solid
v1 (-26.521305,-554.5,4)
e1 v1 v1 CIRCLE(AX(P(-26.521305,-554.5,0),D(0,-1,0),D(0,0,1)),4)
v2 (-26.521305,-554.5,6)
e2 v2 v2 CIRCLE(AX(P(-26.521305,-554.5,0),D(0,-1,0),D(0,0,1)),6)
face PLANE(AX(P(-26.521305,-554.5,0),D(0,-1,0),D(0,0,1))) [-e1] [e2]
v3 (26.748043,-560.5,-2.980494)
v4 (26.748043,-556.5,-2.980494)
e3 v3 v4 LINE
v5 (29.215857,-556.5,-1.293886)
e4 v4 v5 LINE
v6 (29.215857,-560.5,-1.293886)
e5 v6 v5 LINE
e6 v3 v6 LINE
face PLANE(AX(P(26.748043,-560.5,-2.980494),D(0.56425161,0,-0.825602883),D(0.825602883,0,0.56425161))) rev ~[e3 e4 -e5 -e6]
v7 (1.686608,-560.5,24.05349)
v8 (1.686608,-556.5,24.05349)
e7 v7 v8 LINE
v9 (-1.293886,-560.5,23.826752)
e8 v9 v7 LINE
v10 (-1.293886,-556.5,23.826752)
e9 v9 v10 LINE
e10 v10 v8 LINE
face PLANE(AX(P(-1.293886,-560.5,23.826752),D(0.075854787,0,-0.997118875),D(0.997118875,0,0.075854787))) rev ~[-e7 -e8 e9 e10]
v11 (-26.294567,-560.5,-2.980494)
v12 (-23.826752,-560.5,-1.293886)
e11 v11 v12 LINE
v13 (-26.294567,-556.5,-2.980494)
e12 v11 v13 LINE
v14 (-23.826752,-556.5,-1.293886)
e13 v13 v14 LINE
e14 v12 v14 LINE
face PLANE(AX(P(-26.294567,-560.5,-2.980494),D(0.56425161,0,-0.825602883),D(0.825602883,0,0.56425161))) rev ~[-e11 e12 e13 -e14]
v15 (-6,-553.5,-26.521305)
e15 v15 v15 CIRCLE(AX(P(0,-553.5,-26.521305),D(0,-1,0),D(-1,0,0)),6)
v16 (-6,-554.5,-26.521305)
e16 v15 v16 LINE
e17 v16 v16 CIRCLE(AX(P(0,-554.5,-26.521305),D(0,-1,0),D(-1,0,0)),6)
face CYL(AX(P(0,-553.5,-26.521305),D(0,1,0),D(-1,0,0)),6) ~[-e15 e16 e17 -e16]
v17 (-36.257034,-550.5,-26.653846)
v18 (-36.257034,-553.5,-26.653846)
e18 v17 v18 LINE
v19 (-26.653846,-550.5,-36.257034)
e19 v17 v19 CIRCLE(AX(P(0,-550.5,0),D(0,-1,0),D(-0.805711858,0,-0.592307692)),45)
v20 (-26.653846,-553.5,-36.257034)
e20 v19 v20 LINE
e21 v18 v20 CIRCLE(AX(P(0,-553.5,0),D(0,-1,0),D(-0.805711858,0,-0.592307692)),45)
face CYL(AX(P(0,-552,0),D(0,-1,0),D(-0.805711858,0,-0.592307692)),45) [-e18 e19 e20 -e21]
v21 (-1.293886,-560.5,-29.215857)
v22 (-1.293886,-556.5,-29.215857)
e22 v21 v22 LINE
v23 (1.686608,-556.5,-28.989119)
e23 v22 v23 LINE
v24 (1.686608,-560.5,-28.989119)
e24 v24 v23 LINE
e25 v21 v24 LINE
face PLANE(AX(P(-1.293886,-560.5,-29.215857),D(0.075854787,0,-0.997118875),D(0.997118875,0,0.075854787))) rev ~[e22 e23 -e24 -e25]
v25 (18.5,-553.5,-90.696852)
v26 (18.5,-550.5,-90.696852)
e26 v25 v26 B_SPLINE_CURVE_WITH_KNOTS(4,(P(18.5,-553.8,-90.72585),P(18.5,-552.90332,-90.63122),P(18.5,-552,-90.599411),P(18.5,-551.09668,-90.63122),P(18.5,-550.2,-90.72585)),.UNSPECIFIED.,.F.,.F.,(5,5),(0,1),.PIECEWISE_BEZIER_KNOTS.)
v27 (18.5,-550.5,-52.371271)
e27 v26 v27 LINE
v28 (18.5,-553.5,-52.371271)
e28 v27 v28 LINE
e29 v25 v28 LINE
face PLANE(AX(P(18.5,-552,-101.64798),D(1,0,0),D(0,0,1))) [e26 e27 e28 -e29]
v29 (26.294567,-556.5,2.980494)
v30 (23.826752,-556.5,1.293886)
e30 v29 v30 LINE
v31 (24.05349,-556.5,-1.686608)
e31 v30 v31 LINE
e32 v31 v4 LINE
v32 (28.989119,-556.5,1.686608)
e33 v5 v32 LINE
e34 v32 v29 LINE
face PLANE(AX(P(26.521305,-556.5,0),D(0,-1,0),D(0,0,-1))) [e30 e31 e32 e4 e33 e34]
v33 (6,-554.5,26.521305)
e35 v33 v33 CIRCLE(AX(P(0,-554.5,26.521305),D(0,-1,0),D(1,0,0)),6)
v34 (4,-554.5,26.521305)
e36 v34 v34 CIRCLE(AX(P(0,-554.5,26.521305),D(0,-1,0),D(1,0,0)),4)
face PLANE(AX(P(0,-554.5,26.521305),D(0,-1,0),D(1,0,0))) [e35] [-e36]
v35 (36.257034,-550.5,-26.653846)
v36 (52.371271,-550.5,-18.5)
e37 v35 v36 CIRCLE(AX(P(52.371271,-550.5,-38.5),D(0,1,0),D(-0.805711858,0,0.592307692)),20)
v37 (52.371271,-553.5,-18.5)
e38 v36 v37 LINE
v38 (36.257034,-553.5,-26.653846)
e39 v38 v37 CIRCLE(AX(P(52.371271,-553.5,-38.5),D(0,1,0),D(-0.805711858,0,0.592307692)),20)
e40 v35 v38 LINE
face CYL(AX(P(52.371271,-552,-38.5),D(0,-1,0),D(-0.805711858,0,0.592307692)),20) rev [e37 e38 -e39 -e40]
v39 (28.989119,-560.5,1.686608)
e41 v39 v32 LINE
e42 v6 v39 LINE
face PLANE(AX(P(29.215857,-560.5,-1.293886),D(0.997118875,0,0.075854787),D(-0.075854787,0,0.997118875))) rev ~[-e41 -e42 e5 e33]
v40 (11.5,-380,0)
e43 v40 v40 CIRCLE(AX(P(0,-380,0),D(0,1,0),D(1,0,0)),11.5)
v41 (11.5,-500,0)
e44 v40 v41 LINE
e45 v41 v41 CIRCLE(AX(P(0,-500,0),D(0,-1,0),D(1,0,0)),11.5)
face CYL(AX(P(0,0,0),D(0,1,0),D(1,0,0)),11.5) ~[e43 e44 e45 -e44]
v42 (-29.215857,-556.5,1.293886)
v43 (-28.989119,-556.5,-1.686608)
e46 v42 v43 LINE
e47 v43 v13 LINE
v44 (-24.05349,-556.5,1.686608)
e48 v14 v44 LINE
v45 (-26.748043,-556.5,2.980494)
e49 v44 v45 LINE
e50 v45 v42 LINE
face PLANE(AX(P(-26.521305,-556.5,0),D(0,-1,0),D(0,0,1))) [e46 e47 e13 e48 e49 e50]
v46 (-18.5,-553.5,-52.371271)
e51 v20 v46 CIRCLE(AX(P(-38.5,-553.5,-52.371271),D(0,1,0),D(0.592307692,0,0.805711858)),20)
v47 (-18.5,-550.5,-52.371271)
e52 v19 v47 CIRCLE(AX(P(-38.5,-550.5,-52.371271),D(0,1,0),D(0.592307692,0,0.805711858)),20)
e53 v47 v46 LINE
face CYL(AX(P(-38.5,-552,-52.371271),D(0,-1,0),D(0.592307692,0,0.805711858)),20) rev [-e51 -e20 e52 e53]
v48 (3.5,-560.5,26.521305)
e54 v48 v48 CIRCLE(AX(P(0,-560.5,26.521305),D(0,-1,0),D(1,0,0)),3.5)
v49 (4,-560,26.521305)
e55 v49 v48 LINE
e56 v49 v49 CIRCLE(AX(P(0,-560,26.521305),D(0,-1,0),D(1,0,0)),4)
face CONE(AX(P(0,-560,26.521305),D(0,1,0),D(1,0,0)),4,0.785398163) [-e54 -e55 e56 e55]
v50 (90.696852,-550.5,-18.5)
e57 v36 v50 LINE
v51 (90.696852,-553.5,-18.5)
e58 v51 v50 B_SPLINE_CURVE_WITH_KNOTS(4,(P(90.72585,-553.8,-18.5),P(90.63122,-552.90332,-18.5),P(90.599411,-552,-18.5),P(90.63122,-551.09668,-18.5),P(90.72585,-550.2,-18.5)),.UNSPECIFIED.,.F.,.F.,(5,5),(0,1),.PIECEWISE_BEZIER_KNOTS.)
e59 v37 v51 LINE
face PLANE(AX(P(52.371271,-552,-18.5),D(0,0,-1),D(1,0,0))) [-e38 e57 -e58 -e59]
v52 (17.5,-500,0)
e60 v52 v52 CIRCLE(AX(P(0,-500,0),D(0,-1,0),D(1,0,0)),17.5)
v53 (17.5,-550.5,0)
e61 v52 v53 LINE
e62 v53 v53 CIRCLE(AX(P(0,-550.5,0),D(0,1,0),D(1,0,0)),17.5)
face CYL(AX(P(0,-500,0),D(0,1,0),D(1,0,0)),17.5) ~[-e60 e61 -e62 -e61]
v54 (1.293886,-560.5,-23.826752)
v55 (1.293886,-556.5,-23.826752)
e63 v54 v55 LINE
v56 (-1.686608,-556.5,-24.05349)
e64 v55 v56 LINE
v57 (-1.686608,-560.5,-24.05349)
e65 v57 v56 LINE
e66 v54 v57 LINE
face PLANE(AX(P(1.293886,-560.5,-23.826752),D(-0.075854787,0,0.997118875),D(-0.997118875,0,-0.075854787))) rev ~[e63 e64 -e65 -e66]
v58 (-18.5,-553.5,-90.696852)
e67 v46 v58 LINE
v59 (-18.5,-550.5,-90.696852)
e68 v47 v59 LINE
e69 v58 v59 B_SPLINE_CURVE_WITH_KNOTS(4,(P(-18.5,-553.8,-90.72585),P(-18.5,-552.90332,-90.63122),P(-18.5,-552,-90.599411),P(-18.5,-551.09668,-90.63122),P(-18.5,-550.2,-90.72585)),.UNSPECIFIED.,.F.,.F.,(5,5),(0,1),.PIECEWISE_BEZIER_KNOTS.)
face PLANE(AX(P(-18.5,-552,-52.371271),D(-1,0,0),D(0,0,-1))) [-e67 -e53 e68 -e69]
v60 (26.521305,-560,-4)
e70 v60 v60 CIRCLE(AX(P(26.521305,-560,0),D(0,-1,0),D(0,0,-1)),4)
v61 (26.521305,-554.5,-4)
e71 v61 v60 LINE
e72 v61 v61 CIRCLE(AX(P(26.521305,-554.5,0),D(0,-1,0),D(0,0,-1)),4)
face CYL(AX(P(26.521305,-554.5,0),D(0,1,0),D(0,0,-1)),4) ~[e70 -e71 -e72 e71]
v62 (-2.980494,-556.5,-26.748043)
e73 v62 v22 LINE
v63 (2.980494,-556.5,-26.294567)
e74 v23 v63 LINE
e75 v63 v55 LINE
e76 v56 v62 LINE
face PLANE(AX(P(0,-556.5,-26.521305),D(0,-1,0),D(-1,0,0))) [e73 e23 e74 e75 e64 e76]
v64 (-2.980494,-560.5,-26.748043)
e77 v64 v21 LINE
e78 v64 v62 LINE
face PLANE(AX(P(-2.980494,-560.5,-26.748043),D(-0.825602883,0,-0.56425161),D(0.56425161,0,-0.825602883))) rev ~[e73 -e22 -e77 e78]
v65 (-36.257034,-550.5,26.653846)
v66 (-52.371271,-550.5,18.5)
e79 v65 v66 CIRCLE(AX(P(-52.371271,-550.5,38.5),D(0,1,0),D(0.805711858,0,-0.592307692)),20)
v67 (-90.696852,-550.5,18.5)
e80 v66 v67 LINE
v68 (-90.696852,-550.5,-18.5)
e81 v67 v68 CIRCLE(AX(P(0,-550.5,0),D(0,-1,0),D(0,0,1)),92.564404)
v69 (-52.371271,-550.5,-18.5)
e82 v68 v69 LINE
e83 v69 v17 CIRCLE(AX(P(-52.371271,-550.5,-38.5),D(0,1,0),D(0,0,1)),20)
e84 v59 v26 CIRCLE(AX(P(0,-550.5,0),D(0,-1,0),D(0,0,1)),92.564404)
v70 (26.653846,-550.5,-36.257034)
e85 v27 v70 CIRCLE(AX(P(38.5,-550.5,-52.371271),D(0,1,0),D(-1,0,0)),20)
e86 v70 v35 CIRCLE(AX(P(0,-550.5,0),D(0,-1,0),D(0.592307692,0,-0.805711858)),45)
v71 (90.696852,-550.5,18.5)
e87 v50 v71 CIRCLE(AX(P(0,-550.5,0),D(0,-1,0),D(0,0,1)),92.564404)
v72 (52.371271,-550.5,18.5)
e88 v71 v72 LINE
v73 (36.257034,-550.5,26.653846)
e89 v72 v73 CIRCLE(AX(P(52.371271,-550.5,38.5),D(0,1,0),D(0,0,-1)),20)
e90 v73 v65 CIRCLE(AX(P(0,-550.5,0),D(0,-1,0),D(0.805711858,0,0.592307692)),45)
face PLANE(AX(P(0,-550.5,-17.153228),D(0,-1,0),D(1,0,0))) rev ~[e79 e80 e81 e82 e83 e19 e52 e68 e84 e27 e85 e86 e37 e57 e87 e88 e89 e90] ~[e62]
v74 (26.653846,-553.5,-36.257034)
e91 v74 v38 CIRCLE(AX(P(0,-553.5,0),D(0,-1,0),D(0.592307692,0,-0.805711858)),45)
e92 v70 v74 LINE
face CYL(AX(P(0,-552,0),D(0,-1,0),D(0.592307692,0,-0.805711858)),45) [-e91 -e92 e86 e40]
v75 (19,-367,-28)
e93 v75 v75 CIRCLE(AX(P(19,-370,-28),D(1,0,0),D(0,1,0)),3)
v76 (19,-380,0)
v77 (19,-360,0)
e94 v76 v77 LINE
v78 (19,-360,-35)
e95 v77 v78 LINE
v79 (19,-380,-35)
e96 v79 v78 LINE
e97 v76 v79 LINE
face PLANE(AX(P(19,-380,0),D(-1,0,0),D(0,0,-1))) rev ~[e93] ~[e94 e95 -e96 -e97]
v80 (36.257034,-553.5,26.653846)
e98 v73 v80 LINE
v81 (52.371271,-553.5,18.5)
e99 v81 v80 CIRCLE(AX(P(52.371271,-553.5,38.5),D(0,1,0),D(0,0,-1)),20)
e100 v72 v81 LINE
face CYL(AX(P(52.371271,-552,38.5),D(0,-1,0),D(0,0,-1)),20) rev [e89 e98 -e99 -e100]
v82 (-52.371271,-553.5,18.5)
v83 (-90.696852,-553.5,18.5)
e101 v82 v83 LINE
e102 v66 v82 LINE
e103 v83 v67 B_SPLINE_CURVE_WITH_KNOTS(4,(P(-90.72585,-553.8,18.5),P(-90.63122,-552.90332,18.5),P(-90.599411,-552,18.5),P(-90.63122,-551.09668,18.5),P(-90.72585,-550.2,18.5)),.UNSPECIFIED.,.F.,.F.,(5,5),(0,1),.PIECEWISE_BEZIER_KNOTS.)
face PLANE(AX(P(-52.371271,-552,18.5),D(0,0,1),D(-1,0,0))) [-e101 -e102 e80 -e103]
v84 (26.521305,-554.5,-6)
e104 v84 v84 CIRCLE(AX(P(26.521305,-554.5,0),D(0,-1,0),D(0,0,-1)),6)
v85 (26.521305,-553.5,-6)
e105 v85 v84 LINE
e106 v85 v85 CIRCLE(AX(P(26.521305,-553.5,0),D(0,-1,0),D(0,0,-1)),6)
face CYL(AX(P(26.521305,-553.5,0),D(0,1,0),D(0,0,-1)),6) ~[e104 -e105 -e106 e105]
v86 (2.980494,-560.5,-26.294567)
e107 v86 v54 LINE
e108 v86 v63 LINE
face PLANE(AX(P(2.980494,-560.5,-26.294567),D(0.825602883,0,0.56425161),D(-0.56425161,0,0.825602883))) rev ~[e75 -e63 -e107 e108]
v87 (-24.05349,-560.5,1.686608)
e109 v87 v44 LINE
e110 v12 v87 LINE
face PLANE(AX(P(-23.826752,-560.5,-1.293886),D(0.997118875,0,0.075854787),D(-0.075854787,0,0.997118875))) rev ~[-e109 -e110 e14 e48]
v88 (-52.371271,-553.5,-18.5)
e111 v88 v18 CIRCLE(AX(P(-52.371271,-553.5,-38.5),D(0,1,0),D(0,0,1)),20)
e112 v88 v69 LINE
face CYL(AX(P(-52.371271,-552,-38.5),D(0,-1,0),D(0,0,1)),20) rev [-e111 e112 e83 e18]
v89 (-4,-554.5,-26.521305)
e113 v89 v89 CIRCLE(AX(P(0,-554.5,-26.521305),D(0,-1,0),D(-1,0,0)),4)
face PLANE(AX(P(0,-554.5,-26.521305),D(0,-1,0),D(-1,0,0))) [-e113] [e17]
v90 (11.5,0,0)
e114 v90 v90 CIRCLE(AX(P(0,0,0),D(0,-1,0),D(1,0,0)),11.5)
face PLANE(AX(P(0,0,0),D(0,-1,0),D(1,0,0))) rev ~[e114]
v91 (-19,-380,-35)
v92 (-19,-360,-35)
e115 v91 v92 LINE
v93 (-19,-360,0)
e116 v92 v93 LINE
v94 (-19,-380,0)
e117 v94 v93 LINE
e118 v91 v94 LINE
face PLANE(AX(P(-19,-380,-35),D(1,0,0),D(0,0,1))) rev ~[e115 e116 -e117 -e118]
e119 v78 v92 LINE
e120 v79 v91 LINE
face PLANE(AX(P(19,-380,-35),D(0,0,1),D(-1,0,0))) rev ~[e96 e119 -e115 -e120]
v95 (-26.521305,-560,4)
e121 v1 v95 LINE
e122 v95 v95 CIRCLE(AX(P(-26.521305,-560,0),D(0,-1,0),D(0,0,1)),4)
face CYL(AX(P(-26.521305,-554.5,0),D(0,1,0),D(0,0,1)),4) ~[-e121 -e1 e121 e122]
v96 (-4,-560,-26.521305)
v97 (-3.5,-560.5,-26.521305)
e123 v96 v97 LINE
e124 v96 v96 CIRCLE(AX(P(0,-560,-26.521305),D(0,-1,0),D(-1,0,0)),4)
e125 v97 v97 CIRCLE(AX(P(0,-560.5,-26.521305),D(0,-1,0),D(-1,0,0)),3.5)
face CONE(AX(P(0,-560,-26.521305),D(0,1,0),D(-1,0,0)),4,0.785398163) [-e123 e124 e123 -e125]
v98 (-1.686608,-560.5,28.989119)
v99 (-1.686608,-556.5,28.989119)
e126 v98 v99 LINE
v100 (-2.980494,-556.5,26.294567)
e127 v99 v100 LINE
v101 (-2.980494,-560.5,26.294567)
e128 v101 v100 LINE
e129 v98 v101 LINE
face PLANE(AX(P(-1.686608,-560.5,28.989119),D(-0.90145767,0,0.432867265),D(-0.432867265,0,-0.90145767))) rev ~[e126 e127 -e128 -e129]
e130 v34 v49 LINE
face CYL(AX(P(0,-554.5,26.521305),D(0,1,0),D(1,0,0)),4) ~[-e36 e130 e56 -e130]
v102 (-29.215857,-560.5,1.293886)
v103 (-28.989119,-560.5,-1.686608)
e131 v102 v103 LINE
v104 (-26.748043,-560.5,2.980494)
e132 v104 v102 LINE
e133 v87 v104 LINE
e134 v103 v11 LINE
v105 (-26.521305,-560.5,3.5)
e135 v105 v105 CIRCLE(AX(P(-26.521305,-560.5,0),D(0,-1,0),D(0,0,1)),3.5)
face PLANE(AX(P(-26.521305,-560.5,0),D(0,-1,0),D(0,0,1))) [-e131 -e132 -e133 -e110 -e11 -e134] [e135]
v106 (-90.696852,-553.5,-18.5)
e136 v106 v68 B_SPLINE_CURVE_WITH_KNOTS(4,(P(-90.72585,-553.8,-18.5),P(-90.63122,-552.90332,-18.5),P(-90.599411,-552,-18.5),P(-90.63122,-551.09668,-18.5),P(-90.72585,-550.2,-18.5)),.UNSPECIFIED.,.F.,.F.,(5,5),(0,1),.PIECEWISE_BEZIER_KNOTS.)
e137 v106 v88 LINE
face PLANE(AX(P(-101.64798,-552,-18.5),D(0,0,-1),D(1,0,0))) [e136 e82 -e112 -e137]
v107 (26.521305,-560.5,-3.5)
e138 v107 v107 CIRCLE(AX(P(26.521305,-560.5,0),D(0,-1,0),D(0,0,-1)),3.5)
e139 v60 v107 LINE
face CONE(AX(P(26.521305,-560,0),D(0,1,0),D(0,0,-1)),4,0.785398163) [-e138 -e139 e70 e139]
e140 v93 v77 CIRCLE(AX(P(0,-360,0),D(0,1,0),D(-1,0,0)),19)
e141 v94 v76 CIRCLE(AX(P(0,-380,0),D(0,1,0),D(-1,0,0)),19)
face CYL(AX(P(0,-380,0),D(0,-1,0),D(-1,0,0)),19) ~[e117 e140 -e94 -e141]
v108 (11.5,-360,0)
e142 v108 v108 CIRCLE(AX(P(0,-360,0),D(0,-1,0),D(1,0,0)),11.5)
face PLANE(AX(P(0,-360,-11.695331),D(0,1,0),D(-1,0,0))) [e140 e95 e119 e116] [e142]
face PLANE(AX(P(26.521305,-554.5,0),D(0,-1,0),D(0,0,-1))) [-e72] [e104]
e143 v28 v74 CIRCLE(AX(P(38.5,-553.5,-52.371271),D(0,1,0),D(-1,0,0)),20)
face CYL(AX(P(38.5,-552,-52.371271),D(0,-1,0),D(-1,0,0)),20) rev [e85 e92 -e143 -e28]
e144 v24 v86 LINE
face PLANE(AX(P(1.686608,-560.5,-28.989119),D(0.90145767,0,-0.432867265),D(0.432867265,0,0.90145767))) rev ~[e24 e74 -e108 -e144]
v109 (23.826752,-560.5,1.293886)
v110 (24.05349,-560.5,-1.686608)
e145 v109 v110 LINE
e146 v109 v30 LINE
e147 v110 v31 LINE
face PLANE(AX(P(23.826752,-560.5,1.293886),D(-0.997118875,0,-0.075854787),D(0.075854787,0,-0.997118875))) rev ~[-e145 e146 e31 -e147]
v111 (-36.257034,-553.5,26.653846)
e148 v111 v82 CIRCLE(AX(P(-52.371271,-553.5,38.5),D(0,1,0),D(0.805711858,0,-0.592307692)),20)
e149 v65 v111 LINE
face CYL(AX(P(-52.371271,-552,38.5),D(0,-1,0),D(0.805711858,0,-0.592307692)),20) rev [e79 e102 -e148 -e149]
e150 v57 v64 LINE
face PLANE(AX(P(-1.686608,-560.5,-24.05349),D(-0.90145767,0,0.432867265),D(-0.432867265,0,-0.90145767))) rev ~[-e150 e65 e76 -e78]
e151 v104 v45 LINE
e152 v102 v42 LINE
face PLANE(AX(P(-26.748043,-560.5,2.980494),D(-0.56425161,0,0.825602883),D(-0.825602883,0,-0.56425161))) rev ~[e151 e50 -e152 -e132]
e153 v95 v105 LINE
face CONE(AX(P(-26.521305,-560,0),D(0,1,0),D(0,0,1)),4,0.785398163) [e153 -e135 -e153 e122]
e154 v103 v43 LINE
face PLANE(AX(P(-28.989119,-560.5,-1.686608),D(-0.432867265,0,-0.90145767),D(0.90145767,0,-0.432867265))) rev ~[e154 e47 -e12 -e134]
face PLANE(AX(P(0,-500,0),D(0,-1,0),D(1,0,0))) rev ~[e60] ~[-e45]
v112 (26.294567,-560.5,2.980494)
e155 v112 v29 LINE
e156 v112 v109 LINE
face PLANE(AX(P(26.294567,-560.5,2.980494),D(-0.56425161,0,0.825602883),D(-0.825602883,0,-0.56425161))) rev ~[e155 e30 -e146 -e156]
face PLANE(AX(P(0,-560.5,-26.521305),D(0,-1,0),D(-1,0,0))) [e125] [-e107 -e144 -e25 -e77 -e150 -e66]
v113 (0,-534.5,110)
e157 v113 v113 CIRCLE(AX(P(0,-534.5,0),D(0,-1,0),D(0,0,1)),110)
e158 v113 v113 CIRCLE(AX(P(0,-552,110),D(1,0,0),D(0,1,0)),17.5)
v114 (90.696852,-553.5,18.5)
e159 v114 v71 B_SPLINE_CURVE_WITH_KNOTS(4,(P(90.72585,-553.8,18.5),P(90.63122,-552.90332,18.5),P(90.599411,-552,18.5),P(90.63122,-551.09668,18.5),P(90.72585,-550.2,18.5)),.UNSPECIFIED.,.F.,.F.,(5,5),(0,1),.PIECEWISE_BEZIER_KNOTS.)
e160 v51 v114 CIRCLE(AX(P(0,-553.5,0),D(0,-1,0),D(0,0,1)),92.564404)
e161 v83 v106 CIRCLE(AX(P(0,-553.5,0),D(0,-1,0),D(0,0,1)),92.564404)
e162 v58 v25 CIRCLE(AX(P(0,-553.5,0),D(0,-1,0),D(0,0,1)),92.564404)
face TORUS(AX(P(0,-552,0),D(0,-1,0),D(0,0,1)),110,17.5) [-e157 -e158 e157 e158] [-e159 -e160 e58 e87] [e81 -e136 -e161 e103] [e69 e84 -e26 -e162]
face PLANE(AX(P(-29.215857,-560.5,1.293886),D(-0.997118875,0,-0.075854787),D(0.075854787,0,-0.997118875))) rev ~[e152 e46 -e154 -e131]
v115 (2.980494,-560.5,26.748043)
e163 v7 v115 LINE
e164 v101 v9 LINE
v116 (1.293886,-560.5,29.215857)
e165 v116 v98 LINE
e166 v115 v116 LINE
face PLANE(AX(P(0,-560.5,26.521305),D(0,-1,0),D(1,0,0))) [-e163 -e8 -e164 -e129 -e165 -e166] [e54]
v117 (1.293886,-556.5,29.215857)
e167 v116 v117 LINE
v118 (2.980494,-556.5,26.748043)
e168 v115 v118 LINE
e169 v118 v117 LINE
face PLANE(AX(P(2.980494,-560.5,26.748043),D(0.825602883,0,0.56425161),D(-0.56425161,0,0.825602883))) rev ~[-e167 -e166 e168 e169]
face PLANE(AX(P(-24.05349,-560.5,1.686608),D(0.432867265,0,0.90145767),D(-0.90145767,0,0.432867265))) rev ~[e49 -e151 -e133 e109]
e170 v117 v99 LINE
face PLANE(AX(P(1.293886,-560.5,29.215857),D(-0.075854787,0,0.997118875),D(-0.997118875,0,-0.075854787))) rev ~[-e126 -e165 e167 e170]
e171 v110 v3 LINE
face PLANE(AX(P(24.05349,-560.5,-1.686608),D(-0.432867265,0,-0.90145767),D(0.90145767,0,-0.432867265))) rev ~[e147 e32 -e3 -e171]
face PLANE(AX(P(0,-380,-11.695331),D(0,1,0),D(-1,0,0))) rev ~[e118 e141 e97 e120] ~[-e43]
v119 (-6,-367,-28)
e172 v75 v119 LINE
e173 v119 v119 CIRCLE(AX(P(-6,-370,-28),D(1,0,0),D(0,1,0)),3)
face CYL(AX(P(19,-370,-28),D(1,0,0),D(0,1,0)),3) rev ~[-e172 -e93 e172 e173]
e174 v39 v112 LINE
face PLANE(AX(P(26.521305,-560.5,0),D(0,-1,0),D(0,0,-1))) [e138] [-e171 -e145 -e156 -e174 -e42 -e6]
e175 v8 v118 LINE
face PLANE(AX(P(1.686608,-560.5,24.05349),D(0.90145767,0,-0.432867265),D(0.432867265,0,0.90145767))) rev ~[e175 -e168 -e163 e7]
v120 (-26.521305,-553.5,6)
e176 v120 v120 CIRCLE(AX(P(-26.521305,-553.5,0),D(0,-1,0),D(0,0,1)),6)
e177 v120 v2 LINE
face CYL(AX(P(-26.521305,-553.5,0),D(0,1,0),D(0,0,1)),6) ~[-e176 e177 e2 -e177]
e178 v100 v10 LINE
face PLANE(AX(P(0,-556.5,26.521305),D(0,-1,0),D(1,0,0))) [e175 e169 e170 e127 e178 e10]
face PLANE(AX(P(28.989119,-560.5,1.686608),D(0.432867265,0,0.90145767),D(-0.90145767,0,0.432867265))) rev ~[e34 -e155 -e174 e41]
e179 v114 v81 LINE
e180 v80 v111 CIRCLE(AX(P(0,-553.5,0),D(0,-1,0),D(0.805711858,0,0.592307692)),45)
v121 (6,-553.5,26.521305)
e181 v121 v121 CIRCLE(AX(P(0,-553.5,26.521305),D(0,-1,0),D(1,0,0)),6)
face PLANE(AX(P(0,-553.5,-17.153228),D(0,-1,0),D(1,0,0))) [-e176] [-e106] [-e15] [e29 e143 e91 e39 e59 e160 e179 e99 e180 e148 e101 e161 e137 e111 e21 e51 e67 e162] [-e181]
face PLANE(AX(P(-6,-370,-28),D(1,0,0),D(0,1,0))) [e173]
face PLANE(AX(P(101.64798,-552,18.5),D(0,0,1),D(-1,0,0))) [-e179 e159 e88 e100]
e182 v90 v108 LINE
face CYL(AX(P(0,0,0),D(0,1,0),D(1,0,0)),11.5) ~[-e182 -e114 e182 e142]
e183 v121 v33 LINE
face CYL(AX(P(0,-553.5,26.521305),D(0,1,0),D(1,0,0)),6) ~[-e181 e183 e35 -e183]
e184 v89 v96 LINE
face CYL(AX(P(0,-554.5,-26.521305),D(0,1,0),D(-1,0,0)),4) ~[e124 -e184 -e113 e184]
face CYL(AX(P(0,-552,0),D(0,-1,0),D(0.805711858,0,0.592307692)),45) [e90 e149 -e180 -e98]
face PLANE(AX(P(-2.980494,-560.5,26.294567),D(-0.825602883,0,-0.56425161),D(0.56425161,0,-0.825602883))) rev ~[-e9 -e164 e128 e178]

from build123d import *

# Parameters (mm, degrees)
F0_R             = 11.5
F1_DEPTH         = 500
F2_R             = 17.5
F3_DEPTH         = 52
F5_R             = 17.5
F8_DEPTH         = 1.5
F10_R            = 11.5
F11_DEPTH        = 20
F12_R            = 3
F13_DEPTH        = 25
F14_R            = 6
F15_DEPTH        = 1
F15_COPIES_COUNT = 4
F16_R            = 4
F17_DEPTH        = 6
F17_COPIES_COUNT = 4
F19_DEPTH        = 4
F19_COPIES_COUNT = 4
F20_SIZE         = 0.5


# Not quite as in the source:
# - a pattern or mirror of a feature is missing from the dataset's text; its kind, count and spacing are read off the source's solid


with BuildPart() as f1:
    # F0 (on Front) → F1 (new body)
    with BuildSketch(Plane.XZ):
        Circle(F0_R)
    extrude(amount=F1_DEPTH)

    # F2 (on face) → F3 (join)
    with BuildSketch(Plane.XZ.offset(500)):
        Circle(F2_R)
    extrude(amount=F3_DEPTH)



with BuildPart() as f6:
    # F5 (on Right) → F6 (revolve)
    with BuildSketch(Plane.YZ):
        with Locations((-552, 110)):
            Circle(F5_R)
    revolve(axis=Axis((0, -586.2022111416, 0), (0, -1, 0)))


with BuildPart() as f1_1:
    add(f1.part)

    add(f6.part)  # F8 merges F6
    # F7 (on face) → F8 (join, symmetric)
    with BuildSketch(Plane.XZ.offset(552)):
        with BuildLine():
            ThreePointArc((-52.3712707503, -18.5), (-43.3414057713, -20.6545092961), (-36.2570335964, -26.6538461538))
            ThreePointArc((-36.2570335964, -26.6538461538), (-31.8198051534, -31.8198051534), (-26.6538461538, -36.2570335964))
            ThreePointArc((-26.6538461538, -36.2570335964), (-20.6545092961, -43.3414057713), (-18.5, -52.3712707503))
            Line((-18.5, -52.3712707503), (-18.5, -101.6479799574))
            ThreePointArc((-18.5, -101.6479799574), (0, -103.317771121), (18.5, -101.6479799574))
            Line((18.5, -101.6479799574), (18.5, -52.3712707503))
            ThreePointArc((18.5, -52.3712707503), (20.6545092961, -43.3414057713), (26.6538461538, -36.2570335964))
            ThreePointArc((26.6538461538, -36.2570335964), (31.8198051534, -31.8198051534), (36.2570335964, -26.6538461538))
            ThreePointArc((36.2570335964, -26.6538461538), (43.3414057713, -20.6545092961), (52.3712707503, -18.5))
            Line((52.3712707503, -18.5), (101.6479799574, -18.5))
            ThreePointArc((101.6479799574, -18.5), (103.317771121, 0), (101.6479799574, 18.5))
            Line((101.6479799574, 18.5), (52.3712707503, 18.5))
            ThreePointArc((52.3712707503, 18.5), (43.3414057713, 20.6545092961), (36.2570335964, 26.6538461538))
            ThreePointArc((36.2570335964, 26.6538461538), (0, 45), (-36.2570335964, 26.6538461538))
            ThreePointArc((-36.2570335964, 26.6538461538), (-43.3414057713, 20.6545092961), (-52.3712707503, 18.5))
            Line((-52.3712707503, 18.5), (-101.6479799574, 18.5))
            ThreePointArc((-101.6479799574, 18.5), (-103.317771121, 0), (-101.6479799574, -18.5))
            Line((-101.6479799574, -18.5), (-52.3712707503, -18.5))
        make_face()
    extrude(amount=F8_DEPTH, both=True)

    # F10 (on offset) → F11 (join)
    with BuildSketch(Plane(origin=(0, -380, 0), x_dir=(-1, 0, 0), z_dir=(0, 1, 0))):
        with BuildLine():
            Line((19, -35), (19, 0))
            ThreePointArc((19, 0), (0, 19), (-19, 0))
            Line((-19, 0), (-19, -35))
            Line((-19, -35), (19, -35))
        make_face()
        Circle(F10_R, mode=Mode.SUBTRACT)
    extrude(amount=F11_DEPTH)

    # F12 (on face) → F13 (cut)
    with BuildSketch(Plane.YZ.offset(19)):
        with Locations((-370, -28)):
            Circle(F12_R)
    extrude(amount=-F13_DEPTH, mode=Mode.SUBTRACT)

    # F14 (on face) → F15 (join)
    with BuildSketch(Plane.XZ.offset(553.5)):
        with Locations((0, 26.5213046223)):
            Circle(F14_R)
    f15 = extrude(amount=F15_DEPTH)

    # F15_copies: F15 ×4 about axis
    f15_copies_axis = Axis((0, 0, 0), (0, 1, 0))
    for i in range(1, F15_COPIES_COUNT):
        add(f15.rotate(f15_copies_axis, i * 360 / F15_COPIES_COUNT))

    # F16 (on face) → F17 (join)
    with BuildSketch(Plane.XZ.offset(554.5)):
        with Locations((0, 26.5213046223)):
            Circle(F16_R)
    f17 = extrude(amount=F17_DEPTH)

    # F17_copies: F17 ×4 about axis
    f17_copies_axis = Axis((0, 0, 0), (0, 1, 0))
    for i in range(1, F17_COPIES_COUNT):
        add(f17.rotate(f17_copies_axis, i * 360 / F17_COPIES_COUNT))

    # F18 (on face) → F19 (cut)
    with BuildSketch(Plane.XZ.offset(560.5)):
        Polygon((2.9804941814, 26.7480426348), (1.2938862119, 29.2158573055), (-1.6866079695, 28.989119293), (-2.9804941814, 26.2945666098), (-1.2938862119, 23.8267519391), (1.6866079695, 24.0534899516), align=None)
    f19 = extrude(amount=-F19_DEPTH, mode=Mode.SUBTRACT)

    # F19_copies: F19 ×4 about axis
    f19_copies_axis = Axis((0, 0, 0), (0, 1, 0))
    for i in range(1, F19_COPIES_COUNT):
        add(f19.rotate(f19_copies_axis, i * 360 / F19_COPIES_COUNT), mode=Mode.SUBTRACT)

    # F20
    f20_edges = [f1_1.edges().sort_by_distance(p)[0] for p in [
        (-4, -560.5, 26.521305),
        (-26.521305, -560.5, -4),
        (4, -560.5, -26.521305),
        (26.521305, -560.5, 4),
    ]]
    chamfer(f20_edges, length=F20_SIZE)


solid = f1_1.part
